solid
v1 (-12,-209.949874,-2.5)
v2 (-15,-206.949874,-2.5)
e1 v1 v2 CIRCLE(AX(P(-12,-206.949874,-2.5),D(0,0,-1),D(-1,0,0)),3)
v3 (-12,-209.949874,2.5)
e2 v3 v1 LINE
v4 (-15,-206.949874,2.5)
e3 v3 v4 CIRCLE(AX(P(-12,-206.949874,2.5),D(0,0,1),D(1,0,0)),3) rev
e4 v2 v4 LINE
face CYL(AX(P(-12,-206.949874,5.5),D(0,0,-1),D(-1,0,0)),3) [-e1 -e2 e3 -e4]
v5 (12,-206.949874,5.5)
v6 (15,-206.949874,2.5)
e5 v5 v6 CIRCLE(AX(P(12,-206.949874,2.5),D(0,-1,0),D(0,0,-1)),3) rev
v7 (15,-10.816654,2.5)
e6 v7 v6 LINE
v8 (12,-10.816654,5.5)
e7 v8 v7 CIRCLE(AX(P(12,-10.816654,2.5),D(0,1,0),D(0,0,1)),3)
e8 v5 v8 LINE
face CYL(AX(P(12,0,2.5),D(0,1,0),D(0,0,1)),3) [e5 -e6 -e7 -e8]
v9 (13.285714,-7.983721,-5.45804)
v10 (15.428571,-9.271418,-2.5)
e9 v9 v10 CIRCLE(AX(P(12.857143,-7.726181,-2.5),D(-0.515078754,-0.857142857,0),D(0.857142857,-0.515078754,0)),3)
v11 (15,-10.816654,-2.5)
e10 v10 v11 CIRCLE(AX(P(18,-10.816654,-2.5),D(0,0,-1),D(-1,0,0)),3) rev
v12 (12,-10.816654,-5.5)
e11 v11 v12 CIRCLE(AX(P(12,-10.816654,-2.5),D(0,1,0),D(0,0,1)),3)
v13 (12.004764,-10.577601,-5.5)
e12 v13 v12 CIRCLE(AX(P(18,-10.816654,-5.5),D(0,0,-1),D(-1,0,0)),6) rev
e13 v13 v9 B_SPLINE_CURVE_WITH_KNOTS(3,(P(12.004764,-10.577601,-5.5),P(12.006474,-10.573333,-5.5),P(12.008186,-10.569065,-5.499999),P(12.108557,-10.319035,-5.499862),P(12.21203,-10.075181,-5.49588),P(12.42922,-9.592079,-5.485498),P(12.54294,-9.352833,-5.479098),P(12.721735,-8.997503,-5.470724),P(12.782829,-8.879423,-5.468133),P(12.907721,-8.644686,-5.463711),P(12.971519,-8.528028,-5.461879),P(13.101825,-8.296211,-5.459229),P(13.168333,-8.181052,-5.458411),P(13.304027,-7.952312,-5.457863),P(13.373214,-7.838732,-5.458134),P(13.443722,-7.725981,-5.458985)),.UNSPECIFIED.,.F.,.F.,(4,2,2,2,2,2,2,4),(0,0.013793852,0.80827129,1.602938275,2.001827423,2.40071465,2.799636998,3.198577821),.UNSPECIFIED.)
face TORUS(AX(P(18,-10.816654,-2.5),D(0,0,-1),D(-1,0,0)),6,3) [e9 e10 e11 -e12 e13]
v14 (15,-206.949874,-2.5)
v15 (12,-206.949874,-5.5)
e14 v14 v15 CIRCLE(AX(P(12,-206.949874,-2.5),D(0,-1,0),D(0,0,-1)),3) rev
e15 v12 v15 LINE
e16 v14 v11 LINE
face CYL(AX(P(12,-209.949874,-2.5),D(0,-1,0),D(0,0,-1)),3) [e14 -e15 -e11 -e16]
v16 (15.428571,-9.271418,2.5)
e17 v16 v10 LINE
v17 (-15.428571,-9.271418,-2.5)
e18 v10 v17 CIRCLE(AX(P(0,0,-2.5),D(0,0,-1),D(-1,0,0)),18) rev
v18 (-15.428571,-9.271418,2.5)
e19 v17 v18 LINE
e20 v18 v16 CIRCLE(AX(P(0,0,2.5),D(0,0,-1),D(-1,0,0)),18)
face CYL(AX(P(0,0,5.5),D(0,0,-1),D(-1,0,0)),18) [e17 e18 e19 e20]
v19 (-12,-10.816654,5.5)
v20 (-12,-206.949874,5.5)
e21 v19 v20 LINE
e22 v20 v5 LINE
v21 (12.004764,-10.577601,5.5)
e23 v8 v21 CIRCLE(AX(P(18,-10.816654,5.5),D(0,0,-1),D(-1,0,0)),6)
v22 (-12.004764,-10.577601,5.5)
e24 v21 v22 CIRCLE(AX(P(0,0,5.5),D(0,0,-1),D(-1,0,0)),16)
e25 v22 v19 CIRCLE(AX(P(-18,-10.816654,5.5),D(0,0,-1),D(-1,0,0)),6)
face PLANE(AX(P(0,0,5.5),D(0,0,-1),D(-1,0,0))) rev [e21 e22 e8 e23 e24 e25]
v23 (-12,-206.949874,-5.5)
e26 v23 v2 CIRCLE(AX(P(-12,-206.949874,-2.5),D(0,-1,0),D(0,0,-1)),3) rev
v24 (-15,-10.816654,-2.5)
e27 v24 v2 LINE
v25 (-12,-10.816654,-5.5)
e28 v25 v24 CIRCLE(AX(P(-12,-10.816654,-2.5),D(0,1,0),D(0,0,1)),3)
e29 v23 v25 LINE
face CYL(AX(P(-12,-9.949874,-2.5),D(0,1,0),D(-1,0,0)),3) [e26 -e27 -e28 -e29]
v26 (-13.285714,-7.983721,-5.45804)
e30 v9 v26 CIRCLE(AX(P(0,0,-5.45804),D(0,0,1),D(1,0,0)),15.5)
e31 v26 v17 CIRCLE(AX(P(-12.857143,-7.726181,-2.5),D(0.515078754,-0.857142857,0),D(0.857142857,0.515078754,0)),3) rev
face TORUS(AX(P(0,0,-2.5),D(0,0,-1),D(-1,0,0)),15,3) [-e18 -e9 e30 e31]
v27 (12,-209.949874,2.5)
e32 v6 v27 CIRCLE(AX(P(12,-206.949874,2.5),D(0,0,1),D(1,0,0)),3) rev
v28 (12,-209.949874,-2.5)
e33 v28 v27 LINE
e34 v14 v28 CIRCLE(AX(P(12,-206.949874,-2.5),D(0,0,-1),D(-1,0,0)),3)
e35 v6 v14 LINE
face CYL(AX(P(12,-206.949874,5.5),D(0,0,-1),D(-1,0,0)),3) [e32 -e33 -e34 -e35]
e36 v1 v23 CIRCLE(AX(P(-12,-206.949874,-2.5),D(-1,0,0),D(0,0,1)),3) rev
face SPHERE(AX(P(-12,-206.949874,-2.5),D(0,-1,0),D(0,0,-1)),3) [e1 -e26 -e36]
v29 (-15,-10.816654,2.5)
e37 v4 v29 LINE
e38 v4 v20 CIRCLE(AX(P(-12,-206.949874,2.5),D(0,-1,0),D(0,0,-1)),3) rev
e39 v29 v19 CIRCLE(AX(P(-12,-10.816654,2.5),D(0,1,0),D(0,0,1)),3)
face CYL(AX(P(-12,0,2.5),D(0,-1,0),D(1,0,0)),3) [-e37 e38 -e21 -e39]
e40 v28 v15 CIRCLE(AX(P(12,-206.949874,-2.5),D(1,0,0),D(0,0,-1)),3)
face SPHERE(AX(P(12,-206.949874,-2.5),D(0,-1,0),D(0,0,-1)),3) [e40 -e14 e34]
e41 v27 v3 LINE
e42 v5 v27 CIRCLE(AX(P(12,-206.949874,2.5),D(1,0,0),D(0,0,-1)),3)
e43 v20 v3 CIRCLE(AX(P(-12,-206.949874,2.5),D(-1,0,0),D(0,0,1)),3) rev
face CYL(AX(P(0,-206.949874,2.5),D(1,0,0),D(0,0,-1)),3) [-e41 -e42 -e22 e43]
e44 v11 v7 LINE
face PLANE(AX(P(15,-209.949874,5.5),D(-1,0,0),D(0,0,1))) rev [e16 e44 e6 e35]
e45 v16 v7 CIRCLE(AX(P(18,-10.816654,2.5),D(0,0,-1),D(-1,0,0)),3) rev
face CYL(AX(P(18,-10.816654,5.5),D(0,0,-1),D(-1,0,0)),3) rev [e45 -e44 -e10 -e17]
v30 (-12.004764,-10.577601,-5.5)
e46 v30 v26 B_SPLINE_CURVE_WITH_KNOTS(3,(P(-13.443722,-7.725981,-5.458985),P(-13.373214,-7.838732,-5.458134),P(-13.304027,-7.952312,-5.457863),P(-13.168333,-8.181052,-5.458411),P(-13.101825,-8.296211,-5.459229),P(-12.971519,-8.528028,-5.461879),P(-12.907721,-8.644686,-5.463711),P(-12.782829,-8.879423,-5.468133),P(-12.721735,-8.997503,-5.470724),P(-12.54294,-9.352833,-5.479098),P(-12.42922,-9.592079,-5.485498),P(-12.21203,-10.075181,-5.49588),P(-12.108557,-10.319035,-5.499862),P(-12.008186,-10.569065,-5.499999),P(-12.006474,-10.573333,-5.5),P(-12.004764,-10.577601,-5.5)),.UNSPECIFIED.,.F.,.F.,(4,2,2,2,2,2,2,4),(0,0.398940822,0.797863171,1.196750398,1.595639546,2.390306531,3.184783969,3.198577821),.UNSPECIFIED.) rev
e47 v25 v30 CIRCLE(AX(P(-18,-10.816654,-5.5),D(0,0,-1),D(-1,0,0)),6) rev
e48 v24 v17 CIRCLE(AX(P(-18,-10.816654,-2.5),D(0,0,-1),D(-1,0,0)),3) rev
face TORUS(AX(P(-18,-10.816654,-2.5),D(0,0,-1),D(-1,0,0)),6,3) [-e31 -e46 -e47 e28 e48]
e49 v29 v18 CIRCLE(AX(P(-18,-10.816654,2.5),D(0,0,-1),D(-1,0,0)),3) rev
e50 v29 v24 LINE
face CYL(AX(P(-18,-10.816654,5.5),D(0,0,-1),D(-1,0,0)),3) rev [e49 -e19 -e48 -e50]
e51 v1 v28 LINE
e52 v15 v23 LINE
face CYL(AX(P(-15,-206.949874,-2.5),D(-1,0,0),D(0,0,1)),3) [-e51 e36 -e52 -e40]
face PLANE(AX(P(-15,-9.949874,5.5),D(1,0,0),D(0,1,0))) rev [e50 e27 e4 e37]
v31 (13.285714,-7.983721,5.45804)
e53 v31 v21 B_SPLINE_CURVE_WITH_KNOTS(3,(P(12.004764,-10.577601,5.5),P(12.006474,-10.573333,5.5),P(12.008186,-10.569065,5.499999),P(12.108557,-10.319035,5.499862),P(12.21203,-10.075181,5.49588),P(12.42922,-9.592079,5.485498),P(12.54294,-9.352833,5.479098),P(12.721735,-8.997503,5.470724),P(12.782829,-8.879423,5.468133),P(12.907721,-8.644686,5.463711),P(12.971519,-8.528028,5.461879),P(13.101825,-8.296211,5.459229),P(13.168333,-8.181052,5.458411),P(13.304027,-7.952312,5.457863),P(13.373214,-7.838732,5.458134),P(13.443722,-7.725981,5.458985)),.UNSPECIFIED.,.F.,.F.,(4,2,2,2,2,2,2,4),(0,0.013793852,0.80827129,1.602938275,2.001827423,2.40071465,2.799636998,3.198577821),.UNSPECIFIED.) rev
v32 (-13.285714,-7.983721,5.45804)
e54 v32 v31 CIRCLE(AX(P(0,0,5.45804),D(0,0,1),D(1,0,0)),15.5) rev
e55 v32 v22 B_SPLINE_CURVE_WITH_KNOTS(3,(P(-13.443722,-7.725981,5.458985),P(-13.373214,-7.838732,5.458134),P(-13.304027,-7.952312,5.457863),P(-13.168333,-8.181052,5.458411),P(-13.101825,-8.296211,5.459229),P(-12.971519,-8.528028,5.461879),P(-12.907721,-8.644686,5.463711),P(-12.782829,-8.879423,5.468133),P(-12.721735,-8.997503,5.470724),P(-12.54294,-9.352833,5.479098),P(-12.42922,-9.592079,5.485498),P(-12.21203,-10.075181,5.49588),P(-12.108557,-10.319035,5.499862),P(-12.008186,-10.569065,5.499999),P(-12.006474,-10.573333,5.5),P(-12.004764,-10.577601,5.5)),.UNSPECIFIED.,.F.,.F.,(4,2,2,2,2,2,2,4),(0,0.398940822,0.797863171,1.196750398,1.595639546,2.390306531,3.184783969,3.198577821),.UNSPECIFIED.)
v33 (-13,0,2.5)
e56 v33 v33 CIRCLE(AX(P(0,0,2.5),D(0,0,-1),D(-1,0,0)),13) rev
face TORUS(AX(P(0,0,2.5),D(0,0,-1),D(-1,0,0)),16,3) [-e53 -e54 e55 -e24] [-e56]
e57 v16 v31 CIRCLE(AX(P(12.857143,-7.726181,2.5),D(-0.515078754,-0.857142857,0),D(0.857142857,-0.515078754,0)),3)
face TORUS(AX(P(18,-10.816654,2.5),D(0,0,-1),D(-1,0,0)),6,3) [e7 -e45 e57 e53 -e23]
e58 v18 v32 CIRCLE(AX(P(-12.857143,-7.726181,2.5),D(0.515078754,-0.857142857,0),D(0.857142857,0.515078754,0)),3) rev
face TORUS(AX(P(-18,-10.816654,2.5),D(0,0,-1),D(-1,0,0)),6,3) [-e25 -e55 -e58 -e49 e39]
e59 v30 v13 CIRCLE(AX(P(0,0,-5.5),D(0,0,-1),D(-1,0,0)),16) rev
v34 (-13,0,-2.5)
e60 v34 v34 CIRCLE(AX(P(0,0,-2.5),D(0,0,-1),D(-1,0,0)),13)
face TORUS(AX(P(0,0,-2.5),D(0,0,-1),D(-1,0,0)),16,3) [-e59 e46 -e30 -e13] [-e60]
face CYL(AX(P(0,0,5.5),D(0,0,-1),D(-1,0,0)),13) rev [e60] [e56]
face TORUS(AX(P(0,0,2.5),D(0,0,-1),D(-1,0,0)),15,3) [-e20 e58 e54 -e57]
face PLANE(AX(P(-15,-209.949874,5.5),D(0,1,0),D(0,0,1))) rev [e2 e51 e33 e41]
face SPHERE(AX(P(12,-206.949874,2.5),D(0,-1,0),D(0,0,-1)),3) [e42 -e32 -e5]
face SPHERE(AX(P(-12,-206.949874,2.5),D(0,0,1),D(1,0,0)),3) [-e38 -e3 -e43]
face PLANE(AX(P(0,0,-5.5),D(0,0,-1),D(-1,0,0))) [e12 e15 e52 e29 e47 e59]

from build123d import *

# Parameters (mm, degrees)
SKETCH1_R           = 13
BOSS_EXTRUDE1_DEPTH = 5.5
FILLET2_R           = 3


with BuildPart() as part:
    # Sketch1 → Boss-Extrude1 (new, symmetric)
    with BuildSketch(Plane.XY):
        with BuildLine():
            Line((-15, -9.949874371), (-15, -209.949874371))
            Line((-15, -209.949874371), (15, -209.949874371))
            Line((15, -209.949874371), (15, -9.949874371))
            ThreePointArc((15, -9.949874371), (0, 18), (-15, -9.949874371))
        make_face()
        Circle(SKETCH1_R, mode=Mode.SUBTRACT)
    extrude(amount=BOSS_EXTRUDE1_DEPTH, both=True)

    # Fillet2
    # the kernel refuses this fillet: 3 mm, written as the material it adds along each edge
    with BuildSketch(Plane(origin=(15, -9.949874371, 5.5), x_dir=(0.5340574779916704, 0.8454481712093158, 0), z_dir=(0, 0, -1))) as fillet2_piece_1:
        with BuildLine():
            CenterArc((0.869355329, 2.999254564), FILLET2_R, 237.719985552, 31.002719134)
            Line((-0.732817105, 0.46291005), (0, 0))
            ThreePointArc((0, 0), (0.401240921, 0.004472619), (0.802481842, 0))
        make_face()
    extrude(amount=11)
    with BuildSketch(Plane(origin=(-15, -9.949874371, 5.5), x_dir=(0, -1, 0), z_dir=(0, 0, -1))) as fillet2_piece_2:
        with BuildLine():
            CenterArc((0.866779455, 3), FILLET2_R, 238.997280866, 31.002719134)
            ThreePointArc((-0.678456806, 0.428571429), (-0.336839767, 0.218067082), (0, 0))
            Line((0, 0), (0.866779455, 0))
        make_face()
    extrude(amount=11)
    # the kernel refuses this fillet: 3 mm, written as the material it takes off along each edge
    with BuildSketch(Plane(origin=(0, 0, -5.5), x_dir=(1, 0, 0), z_dir=(0, -1, 0))) as fillet2_2_piece_1:
        with BuildLine():
            CenterArc((13 + FILLET2_R, FILLET2_R), FILLET2_R, 180, 90)
            Line((13, FILLET2_R), (13, 0))
            Line((13, 0), (13 + FILLET2_R, 0))
        make_face()
    revolve(axis=Axis((0, 0, -5.5), (0, 0, 1)), mode=Mode.SUBTRACT)
    with BuildSketch(Plane(origin=(0, 0, 5.5), x_dir=(1, 0, 0), z_dir=(0, -1, 0))) as fillet2_2_piece_2:
        with BuildLine():
            CenterArc((13 + FILLET2_R, -FILLET2_R), FILLET2_R, 90, 90)
            Line((13, -FILLET2_R), (13, 0))
            Line((13, 0), (13 + FILLET2_R, 0))
        make_face()
    revolve(axis=Axis((0, 0, 5.5), (0, 0, 1)), mode=Mode.SUBTRACT)
    with BuildSketch(Plane(origin=(-22.5, -209.949874371, 5.5), x_dir=(0, 1, 0), z_dir=(1, 0, 0)), Plane(origin=(-22.5, -209.949874371, -5.5), x_dir=(0, 0, 1), z_dir=(1, 0, 0))) as fillet2_2_piece_3:
        with BuildLine():
            CenterArc((FILLET2_R, -FILLET2_R), FILLET2_R, 90, 90)
            Line((0, -FILLET2_R), (0, 0))
            Line((0, 0), (FILLET2_R, 0))
        make_face()
    extrude(amount=45, mode=Mode.SUBTRACT)
    with BuildSketch(Plane(origin=(15, -209.949874371, -13), x_dir=(-1, 0, 0), z_dir=(0, 0, 1)), Plane(origin=(-15, -209.949874371, -13), x_dir=(0, 1, 0), z_dir=(0, 0, 1))) as fillet2_2_piece_4:
        with BuildLine():
            CenterArc((FILLET2_R, -FILLET2_R), FILLET2_R, 90, 90)
            Line((0, -FILLET2_R), (0, 0))
            Line((0, 0), (FILLET2_R, 0))
        make_face()
    extrude(amount=26, mode=Mode.SUBTRACT)
    # the kernel refuses this fillet: 3 mm, written as the material it takes off along each edge
    with BuildSketch(Plane(origin=(-12, -206.949874371, 2.5), x_dir=(0, 0, 1), z_dir=(-1, 0, 0))) as fillet2_3_piece_1_section:
        Polygon((0, 0), (FILLET2_R, 0), (FILLET2_R, -FILLET2_R), (0, -FILLET2_R), align=None)
    fillet2_3_piece_1 = extrude(amount=FILLET2_R, mode=Mode.PRIVATE)
    fillet2_3_piece_1 = fillet2_3_piece_1 - Plane(origin=(-12, -206.949874371, 2.5), x_dir=(0, 0.7071067811865475, -0.7071067811865475), z_dir=(-1, 0, 0)) * Sphere(FILLET2_R, mode=Mode.PRIVATE)
    add(fillet2_3_piece_1, mode=Mode.SUBTRACT)
    with BuildSketch(Plane(origin=(-12, -206.949874371, -2.5), x_dir=(0, 0, -1), z_dir=(-1, 0, 0))) as fillet2_3_piece_2_section:
        Polygon((0, 0), (FILLET2_R, 0), (FILLET2_R, FILLET2_R), (0, FILLET2_R), align=None)
    fillet2_3_piece_2 = extrude(amount=FILLET2_R, mode=Mode.PRIVATE)
    fillet2_3_piece_2 = fillet2_3_piece_2 - Plane(origin=(-12, -206.949874371, -2.5), x_dir=(0, 0.7071067811865475, 0.7071067811865475), z_dir=(-1, 0, 0)) * Sphere(FILLET2_R, mode=Mode.PRIVATE)
    add(fillet2_3_piece_2, mode=Mode.SUBTRACT)
    with BuildSketch(Plane(origin=(12, -206.949874371, -2.5), x_dir=(1, 0, 0), z_dir=(0, 0, -1))) as fillet2_3_piece_3_section:
        Polygon((0, 0), (FILLET2_R, 0), (FILLET2_R, FILLET2_R), (0, FILLET2_R), align=None)
    fillet2_3_piece_3 = extrude(amount=FILLET2_R, mode=Mode.PRIVATE)
    fillet2_3_piece_3 = fillet2_3_piece_3 - Plane(origin=(12, -206.949874371, -2.5), x_dir=(-0.7071067811865475, 0.7071067811865475, 0), z_dir=(0, 0, -1)) * Sphere(FILLET2_R, mode=Mode.PRIVATE)
    add(fillet2_3_piece_3, mode=Mode.SUBTRACT)
    with BuildSketch(Plane(origin=(12, -206.949874371, 2.5), x_dir=(1, 0, 0), z_dir=(0, 0, 1))) as fillet2_3_piece_4_section:
        Polygon((0, 0), (FILLET2_R, 0), (FILLET2_R, -FILLET2_R), (0, -FILLET2_R), align=None)
    fillet2_3_piece_4 = extrude(amount=FILLET2_R, mode=Mode.PRIVATE)
    fillet2_3_piece_4 = fillet2_3_piece_4 - Plane(origin=(12, -206.949874371, 2.5), x_dir=(-0.7071067811865475, 0.7071067811865475, 0), z_dir=(0, 0, 1)) * Sphere(FILLET2_R, mode=Mode.PRIVATE)
    add(fillet2_3_piece_4, mode=Mode.SUBTRACT)
    with BuildSketch(Plane(origin=(15, -206.949874371, 5.5), x_dir=(-1, 0, 0), z_dir=(0, 1, 0)), Plane(origin=(-15, -10.816653826, -5.5), x_dir=(0, 0, 1), z_dir=(0, -1, 0))) as fillet2_3_piece_5:
        with BuildLine():
            CenterArc((FILLET2_R, -FILLET2_R), FILLET2_R, 90, 90)
            Line((0, -FILLET2_R), (0, 0))
            Line((0, 0), (FILLET2_R, 0))
        make_face()
    extrude(amount=196.133220545, mode=Mode.SUBTRACT)
    with BuildSketch(Plane(origin=(0, 0, 5.5), x_dir=(0.8571428571428582, -0.5150787536377108, 0), z_dir=(-0.5150787536377108, -0.8571428571428582, 0))) as fillet2_3_piece_6:
        with BuildLine():
            CenterArc((18 - FILLET2_R, -FILLET2_R), FILLET2_R, 0, 90)
            Line((18, -FILLET2_R), (18, 0))
            Line((18, 0), (18 - FILLET2_R, 0))
        make_face()
    revolve(axis=Axis((0, 0, 5.5), (0, 0, 1)), revolution_arc=242.005438268, mode=Mode.SUBTRACT)
    with BuildSketch(Plane(origin=(15, -206.949874371, -5.5), x_dir=(-1, 0, 0), z_dir=(0, 1, 0)), Plane(origin=(-15, -10.816653826, 5.5), x_dir=(0, 0, -1), z_dir=(0, -1, 0))) as fillet2_3_piece_7:
        with BuildLine():
            CenterArc((FILLET2_R, FILLET2_R), FILLET2_R, 180, 90)
            Line((0, FILLET2_R), (0, 0))
            Line((0, 0), (FILLET2_R, 0))
        make_face()
    extrude(amount=196.133220545, mode=Mode.SUBTRACT)
    with BuildSketch(Plane(origin=(0, 0, -5.5), x_dir=(0.8571428571428582, -0.5150787536377108, 0), z_dir=(-0.5150787536377108, -0.8571428571428582, 0))) as fillet2_3_piece_8:
        with BuildLine():
            CenterArc((18 - FILLET2_R, FILLET2_R), FILLET2_R, 270, 90)
            Line((18, FILLET2_R), (18, 0))
            Line((18, 0), (18 - FILLET2_R, 0))
        make_face()
    revolve(axis=Axis((0, 0, -5.5), (0, 0, 1)), revolution_arc=242.005438268, mode=Mode.SUBTRACT)
    with BuildSketch(Plane(origin=(-18, -10.816653826, 5.5), x_dir=(1, 0, 0), z_dir=(0, -1, 0))) as fillet2_3_piece_9:
        with BuildLine():
            CenterArc((3 + FILLET2_R, -FILLET2_R), FILLET2_R, 90, 90)
            Line((3, -FILLET2_R), (3, 0))
            Line((3, 0), (3 + FILLET2_R, 0))
        make_face()
    revolve(axis=Axis((-18, -10.816653826, 5.5), (0, 0, 1)), revolution_arc=31.002719134, mode=Mode.SUBTRACT)
    with BuildSketch(Plane(origin=(18, -10.816653826, -5.5), x_dir=(-0.8571428571428581, 0.5150787536377112, 0), z_dir=(0.5150787536377112, 0.8571428571428581, 0))) as fillet2_3_piece_10:
        with BuildLine():
            CenterArc((3 + FILLET2_R, FILLET2_R), FILLET2_R, 180, 90)
            Line((3, FILLET2_R), (3, 0))
            Line((3, 0), (3 + FILLET2_R, 0))
        make_face()
    revolve(axis=Axis((18, -10.816653826, -5.5), (0, 0, 1)), revolution_arc=31.002719134, mode=Mode.SUBTRACT)
    with BuildSketch(Plane(origin=(-18, -10.816653826, -5.5), x_dir=(1, 0, 0), z_dir=(0, -1, 0))) as fillet2_3_piece_11:
        with BuildLine():
            CenterArc((3 + FILLET2_R, FILLET2_R), FILLET2_R, 180, 90)
            Line((3, FILLET2_R), (3, 0))
            Line((3, 0), (3 + FILLET2_R, 0))
        make_face()
    revolve(axis=Axis((-18, -10.816653826, -5.5), (0, 0, 1)), revolution_arc=31.002719134, mode=Mode.SUBTRACT)
    with BuildSketch(Plane(origin=(18, -10.816653826, 5.5), x_dir=(-0.8571428571428581, 0.5150787536377112, 0), z_dir=(0.5150787536377112, 0.8571428571428581, 0))) as fillet2_3_piece_12:
        with BuildLine():
            CenterArc((3 + FILLET2_R, -FILLET2_R), FILLET2_R, 90, 90)
            Line((3, -FILLET2_R), (3, 0))
            Line((3, 0), (3 + FILLET2_R, 0))
        make_face()
    revolve(axis=Axis((18, -10.816653826, 5.5), (0, 0, 1)), revolution_arc=31.002719134, mode=Mode.SUBTRACT)


solid = part.part
